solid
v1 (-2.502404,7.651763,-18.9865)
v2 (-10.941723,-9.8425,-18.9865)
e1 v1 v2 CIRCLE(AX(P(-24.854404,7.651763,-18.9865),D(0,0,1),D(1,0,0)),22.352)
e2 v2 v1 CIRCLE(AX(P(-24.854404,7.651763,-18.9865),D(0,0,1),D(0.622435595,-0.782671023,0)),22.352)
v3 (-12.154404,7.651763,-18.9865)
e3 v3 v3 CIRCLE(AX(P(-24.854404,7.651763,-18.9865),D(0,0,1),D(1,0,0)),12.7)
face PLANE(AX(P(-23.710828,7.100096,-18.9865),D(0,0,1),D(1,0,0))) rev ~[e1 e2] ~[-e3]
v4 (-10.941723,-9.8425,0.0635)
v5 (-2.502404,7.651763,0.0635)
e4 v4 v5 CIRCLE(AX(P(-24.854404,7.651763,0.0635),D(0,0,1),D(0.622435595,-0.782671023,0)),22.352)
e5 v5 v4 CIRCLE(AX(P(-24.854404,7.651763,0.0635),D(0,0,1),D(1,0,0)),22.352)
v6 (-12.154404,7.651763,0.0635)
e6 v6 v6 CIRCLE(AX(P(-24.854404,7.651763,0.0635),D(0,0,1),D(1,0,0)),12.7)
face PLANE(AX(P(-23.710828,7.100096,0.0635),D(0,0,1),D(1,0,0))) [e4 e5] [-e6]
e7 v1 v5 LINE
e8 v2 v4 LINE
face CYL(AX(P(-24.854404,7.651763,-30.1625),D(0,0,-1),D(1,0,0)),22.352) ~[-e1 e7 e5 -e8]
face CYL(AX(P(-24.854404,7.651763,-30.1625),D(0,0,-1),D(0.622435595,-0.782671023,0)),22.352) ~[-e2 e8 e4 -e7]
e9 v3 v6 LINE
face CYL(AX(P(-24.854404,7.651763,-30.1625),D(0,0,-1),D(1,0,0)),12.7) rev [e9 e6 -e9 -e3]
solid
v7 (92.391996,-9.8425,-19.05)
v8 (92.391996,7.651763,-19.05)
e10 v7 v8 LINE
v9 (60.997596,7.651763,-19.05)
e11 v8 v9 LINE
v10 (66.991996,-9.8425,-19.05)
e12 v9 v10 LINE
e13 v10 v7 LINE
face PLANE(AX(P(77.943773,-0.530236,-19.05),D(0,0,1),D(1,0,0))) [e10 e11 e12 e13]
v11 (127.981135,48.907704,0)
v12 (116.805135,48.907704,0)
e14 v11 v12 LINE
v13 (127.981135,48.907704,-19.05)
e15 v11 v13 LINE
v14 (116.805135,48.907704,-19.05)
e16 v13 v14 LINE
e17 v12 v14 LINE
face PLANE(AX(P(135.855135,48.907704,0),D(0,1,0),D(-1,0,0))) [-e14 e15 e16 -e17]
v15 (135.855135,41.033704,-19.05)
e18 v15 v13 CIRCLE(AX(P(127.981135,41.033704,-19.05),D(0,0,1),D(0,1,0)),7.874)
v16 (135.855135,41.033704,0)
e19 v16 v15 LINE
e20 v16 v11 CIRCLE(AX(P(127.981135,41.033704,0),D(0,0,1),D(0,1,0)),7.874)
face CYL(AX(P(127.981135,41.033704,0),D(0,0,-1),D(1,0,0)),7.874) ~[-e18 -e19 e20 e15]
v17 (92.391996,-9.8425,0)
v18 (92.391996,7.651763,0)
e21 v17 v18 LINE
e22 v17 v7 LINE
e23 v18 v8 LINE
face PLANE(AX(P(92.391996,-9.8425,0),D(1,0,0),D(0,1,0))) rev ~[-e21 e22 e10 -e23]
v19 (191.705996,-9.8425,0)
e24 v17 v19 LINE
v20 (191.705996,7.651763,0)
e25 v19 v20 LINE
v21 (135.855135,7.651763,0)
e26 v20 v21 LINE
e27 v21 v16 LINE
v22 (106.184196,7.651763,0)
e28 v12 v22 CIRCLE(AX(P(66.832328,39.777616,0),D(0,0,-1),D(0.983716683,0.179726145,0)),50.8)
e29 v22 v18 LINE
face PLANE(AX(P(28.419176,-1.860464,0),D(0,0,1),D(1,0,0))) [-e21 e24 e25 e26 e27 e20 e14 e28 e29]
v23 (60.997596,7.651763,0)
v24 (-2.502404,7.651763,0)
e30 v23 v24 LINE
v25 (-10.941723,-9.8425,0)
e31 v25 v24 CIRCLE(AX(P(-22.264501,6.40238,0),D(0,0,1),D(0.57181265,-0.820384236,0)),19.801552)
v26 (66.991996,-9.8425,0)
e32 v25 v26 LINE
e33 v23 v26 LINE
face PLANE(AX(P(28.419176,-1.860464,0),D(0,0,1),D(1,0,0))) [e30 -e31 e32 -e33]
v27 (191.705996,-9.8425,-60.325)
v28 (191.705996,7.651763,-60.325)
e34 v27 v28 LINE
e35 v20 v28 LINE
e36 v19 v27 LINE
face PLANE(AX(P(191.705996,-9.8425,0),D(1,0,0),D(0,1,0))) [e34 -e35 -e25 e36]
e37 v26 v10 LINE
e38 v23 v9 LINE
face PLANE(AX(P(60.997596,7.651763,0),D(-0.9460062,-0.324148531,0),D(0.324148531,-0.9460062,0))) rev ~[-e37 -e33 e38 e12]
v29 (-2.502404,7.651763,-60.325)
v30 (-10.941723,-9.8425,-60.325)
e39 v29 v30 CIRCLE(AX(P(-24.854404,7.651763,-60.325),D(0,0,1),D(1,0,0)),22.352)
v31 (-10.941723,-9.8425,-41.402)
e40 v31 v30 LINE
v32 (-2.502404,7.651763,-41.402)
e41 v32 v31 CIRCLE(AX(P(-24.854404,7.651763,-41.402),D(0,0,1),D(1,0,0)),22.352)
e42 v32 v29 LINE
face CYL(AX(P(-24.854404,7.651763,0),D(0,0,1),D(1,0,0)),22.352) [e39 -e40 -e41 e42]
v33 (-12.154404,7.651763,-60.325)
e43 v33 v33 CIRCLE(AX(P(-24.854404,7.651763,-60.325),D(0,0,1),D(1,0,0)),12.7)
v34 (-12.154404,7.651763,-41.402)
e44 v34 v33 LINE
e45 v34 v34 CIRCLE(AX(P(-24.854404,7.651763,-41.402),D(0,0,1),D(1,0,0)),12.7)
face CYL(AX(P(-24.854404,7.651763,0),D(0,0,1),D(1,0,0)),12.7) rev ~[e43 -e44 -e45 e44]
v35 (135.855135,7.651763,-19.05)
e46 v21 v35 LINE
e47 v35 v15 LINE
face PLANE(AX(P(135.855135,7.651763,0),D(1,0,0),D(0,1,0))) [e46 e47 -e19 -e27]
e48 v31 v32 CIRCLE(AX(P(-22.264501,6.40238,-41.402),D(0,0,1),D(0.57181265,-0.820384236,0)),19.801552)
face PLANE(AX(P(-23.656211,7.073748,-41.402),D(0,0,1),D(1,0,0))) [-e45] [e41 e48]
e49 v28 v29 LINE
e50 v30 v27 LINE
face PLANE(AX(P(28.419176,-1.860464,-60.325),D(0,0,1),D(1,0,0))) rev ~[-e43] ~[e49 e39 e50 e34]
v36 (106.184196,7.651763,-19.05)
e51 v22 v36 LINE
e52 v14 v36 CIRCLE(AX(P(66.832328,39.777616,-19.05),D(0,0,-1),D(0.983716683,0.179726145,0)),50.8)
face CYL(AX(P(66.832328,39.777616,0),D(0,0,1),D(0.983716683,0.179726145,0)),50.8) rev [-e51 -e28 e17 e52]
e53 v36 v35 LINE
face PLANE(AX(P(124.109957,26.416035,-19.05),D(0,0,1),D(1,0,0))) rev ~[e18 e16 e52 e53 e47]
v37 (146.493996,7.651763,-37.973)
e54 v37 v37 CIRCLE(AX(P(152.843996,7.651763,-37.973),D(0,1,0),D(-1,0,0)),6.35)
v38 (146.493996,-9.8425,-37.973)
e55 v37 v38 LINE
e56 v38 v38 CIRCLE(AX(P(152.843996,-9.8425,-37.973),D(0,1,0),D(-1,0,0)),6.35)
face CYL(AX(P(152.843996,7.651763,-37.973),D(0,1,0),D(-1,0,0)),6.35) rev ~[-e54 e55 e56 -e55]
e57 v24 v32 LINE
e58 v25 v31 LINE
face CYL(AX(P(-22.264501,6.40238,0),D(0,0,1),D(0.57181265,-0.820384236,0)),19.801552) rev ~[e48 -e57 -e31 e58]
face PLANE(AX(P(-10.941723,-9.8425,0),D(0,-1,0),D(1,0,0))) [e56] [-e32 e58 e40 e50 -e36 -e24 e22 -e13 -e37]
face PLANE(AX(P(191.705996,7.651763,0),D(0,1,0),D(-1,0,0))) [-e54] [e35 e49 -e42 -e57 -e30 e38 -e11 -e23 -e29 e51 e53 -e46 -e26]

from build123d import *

# Parameters (mm, degrees)
F0_R      = 12.7
F1_DEPTH  = 60.325
F2_DEPTH  = 19.05
F3_R      = 7.874
F4_DEPTH  = 19.05
F5_R      = 6.35
F6_DEPTH  = 22.353
F9_R      = 12.7
F10_DEPTH = 41.402
F8_R      = 12.7
F11_DEPTH = 30.226
F12_DEPTH = 11.176


# Not quite as in the source:
# - a feature names something its author has since deleted; it is built from what else it names


with BuildPart() as f1:
    # F0 (on Top) → F1 (new body)
    with BuildSketch(Plane.XY):
        with BuildLine():
            Line((-10.9417234689, -9.842500207), (66.9919961198, -9.842500207))
            Line((66.9919961198, -9.842500207), (60.9975961198, 7.6517625031))
            Line((60.9975961198, 7.6517625031), (-2.5024038802, 7.6517625031))
            ThreePointArc((-2.5024038802, 7.6517625031), (-4.7224872234, -2.0599745054), (-10.9417234689, -9.842500207))
        make_face()
        Polygon((92.3919961198, 7.6517625031), (92.3919961198, -9.842500207), (191.7059961198, -9.842500207), (191.7059961198, 7.6517625031), (135.8551350103, 7.6517625031), (106.1841961198, 7.6517625031), align=None)
        with BuildLine():
            ThreePointArc((-2.5024038802, 7.6517625031), (-44.986320537, 17.3634995117), (-10.9417234689, -9.842500207))
            ThreePointArc((-10.9417234689, -9.842500207), (-4.7224872234, -2.0599745054), (-2.5024038802, 7.6517625031))
        make_face()
        with Locations((-24.8544038802, 7.6517625031)):
            Circle(F0_R, mode=Mode.SUBTRACT)
        Polygon((60.9975961198, 7.6517625031), (66.9919961198, -9.842500207), (92.3919961198, -9.842500207), (92.3919961198, 7.6517625031), align=None)
    extrude(amount=-F1_DEPTH)

    # F0 (on Top) → F2 (join)
    with BuildSketch(Plane.XY):
        with BuildLine():
            ThreePointArc((116.8051350103, 48.9077037828), (116.0282380438, 27.1126092147), (106.1841961198, 7.6517625031))
            Line((106.1841961198, 7.6517625031), (135.8551350103, 7.6517625031))
            Line((135.8551350103, 7.6517625031), (135.8551350103, 48.9077037828))
            Line((135.8551350103, 48.9077037828), (116.8051350103, 48.9077037828))
        make_face()
    extrude(amount=-F2_DEPTH)

    # F3
    f3_edges = [f1.edges().sort_by_distance(p)[0] for p in [
        (135.855135, 48.907704, -9.525),
    ]]
    fillet(f3_edges, radius=F3_R)

    # F0 (on Top) → F4 (cut)
    with BuildSketch(Plane.XY):
        Polygon((60.9975961198, 7.6517625031), (66.9919961198, -9.842500207), (92.3919961198, -9.842500207), (92.3919961198, 7.6517625031), align=None)
    extrude(amount=-F4_DEPTH, mode=Mode.SUBTRACT)

    # F5 (on face) → F6 (cut, through all)
    with BuildSketch(Plane(origin=(0, 7.6517625031, 0), x_dir=(-1, 0, 0), z_dir=(0, 1, 0))):
        with Locations((-152.8439961198, -37.973)):
            Circle(F5_R)
    extrude(amount=-F6_DEPTH, mode=Mode.SUBTRACT)

    # F9 (on face) → F10 (cut)
    with BuildSketch(Plane.XY):
        with BuildLine():
            ThreePointArc((-2.5024038802, 7.6517625031), (-44.986320537, 17.3634995117), (-10.9417234689, -9.842500207))
            ThreePointArc((-10.9417234689, -9.842500207), (-4.4297129577, -2.2012102715), (-2.5024038802, 7.6517625031))
        make_face()
        with Locations((-24.8544038802, 7.6517625031)):
            Circle(F9_R, mode=Mode.SUBTRACT)
    extrude(amount=-F10_DEPTH, mode=Mode.SUBTRACT)


with BuildPart() as f11:
    # F8 (on offset) → F11 (new body)
    with BuildSketch(Plane.XY.offset(-30.1625)):
        with BuildLine():
            ThreePointArc((-2.5024038802, 7.6517625031), (-44.986320537, 17.3634995117), (-10.9417234689, -9.842500207))
            ThreePointArc((-10.9417234689, -9.842500207), (-4.7224872234, -2.0599745054), (-2.5024038802, 7.6517625031))
        make_face()
        with Locations((-24.8544038802, 7.6517625031)):
            Circle(F8_R, mode=Mode.SUBTRACT)
    extrude(amount=F11_DEPTH)

    # F12 (cut): a face of the model
    f12_faces = [f11.faces().sort_by_distance(p)[0] for p in [
        (-38.373574265, 24.6512127415, -30.1625),
    ]]
    extrude(f12_faces, amount=-F12_DEPTH, mode=Mode.SUBTRACT)


solid = Compound([f1.part, f11.part])
